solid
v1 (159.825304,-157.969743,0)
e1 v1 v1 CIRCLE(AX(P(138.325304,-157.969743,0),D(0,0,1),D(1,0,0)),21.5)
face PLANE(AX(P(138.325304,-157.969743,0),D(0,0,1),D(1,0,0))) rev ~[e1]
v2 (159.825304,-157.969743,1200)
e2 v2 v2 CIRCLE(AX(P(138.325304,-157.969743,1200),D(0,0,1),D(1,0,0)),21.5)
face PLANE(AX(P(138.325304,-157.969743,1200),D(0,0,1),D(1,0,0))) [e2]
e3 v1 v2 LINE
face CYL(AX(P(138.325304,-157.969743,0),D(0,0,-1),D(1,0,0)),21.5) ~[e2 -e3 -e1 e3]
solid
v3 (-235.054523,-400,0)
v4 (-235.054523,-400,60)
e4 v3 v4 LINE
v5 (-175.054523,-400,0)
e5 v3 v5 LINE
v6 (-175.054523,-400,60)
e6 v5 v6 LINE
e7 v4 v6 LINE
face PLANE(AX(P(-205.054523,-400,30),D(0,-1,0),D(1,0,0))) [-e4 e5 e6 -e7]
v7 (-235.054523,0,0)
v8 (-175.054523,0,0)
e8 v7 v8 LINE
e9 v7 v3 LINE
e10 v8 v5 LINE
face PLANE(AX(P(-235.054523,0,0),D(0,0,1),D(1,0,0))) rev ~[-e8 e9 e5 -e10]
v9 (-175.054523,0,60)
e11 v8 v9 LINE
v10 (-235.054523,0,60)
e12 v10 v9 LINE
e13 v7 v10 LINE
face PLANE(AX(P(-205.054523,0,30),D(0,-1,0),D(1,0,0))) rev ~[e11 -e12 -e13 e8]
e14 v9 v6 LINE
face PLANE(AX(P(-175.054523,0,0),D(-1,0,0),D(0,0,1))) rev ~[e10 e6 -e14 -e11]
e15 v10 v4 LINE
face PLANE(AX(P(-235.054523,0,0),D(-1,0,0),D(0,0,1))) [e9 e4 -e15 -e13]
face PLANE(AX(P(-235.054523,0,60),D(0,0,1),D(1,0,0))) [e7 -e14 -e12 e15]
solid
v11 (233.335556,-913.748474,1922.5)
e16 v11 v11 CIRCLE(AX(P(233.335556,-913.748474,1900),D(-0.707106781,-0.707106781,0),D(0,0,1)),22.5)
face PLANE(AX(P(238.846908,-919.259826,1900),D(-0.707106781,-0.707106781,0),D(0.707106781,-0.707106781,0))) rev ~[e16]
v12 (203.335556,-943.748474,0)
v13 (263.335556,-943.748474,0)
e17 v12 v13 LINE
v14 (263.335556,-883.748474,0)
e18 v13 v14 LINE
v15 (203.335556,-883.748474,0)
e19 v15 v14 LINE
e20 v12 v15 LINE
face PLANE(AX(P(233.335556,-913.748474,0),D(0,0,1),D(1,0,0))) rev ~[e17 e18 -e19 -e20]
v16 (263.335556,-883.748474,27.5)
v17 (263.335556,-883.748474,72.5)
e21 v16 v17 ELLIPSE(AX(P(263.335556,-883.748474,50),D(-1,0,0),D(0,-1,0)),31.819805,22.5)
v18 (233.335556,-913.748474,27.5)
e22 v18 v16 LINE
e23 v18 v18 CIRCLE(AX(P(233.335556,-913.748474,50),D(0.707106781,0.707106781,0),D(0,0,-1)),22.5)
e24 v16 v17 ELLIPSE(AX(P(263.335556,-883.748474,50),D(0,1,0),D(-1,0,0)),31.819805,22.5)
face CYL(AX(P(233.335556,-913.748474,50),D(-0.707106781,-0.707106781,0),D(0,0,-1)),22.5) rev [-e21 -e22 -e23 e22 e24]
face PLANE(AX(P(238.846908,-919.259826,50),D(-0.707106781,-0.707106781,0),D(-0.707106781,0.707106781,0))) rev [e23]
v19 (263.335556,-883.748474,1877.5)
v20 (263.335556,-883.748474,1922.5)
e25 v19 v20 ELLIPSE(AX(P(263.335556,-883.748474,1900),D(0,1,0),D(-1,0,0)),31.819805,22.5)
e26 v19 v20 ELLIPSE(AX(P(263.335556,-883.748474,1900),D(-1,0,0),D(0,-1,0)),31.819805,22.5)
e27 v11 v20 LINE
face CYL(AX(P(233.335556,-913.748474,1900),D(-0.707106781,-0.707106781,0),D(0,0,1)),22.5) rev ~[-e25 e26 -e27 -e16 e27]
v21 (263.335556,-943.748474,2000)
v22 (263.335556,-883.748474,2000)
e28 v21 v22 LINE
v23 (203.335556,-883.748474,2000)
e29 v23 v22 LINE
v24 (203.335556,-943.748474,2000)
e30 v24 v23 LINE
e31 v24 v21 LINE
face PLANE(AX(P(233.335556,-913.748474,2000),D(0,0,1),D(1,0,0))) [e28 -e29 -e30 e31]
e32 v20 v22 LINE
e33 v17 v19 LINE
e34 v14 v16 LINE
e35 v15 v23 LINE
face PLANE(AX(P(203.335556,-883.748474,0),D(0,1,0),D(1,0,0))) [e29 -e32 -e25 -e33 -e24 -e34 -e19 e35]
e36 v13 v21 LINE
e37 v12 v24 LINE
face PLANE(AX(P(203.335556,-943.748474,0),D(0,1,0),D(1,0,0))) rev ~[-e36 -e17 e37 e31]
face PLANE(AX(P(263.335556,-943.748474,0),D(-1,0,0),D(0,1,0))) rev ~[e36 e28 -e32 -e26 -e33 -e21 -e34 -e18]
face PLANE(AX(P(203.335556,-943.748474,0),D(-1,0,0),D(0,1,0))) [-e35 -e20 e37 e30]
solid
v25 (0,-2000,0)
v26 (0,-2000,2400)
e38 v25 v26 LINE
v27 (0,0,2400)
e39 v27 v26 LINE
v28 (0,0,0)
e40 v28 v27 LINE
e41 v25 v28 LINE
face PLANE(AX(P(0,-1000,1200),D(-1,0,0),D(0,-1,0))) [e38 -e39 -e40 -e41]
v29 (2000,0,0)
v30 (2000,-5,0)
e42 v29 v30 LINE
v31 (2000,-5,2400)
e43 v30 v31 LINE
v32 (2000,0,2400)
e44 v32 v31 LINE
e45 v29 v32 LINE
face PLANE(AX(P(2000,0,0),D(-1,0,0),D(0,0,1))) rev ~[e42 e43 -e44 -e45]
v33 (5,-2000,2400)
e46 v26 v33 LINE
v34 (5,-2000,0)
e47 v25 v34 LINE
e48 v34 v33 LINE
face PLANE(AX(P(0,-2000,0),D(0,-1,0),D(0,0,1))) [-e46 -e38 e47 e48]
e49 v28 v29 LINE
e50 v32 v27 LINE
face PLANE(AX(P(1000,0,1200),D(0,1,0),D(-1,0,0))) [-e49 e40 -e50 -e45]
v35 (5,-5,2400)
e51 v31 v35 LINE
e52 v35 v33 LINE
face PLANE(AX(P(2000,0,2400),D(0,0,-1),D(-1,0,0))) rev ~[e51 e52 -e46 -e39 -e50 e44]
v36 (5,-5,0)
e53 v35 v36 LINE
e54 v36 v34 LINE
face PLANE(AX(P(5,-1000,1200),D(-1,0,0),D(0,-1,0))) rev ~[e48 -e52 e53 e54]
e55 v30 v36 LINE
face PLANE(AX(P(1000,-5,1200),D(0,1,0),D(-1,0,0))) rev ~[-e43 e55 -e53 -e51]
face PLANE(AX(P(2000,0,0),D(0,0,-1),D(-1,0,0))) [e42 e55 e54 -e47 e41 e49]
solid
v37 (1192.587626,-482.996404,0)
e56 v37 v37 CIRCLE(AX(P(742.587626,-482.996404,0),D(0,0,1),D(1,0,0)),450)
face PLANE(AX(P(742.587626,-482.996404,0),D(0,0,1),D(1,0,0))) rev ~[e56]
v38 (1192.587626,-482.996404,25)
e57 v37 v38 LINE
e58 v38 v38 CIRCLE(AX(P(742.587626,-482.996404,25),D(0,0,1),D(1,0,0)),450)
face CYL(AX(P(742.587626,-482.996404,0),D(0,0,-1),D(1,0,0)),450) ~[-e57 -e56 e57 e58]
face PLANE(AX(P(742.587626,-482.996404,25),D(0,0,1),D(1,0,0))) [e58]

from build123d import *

# Parameters (mm, degrees)
F2_W      = 60
F2_H      = 60
F3_DEPTH  = 2000
F1_E1_W   = 2000
F1_E1_H   = 2400
F4_DEPTH  = 5
F1_E0_W   = 2000
F1_E0_H   = 2400
F5_DEPTH  = 5
F6_R      = 21.5
F7_DEPTH  = 1200
F10_DEPTH = 76
F12_R     = 450
F13_DEPTH = 25
F14_W     = 60
F14_H     = 60
F15_DEPTH = 400


# Not quite as in the source:
# - a pattern or mirror of a feature is missing from the dataset's text; its kind, count and spacing are read off the source's solid


with BuildPart() as f3:
    # F2 (on Top) → F3 (new body)
    with BuildSketch(Plane.XY):
        with Locations((233.3355557919, -913.7484741211)):
            Rectangle(F2_W, F2_H)
    extrude(amount=F3_DEPTH)

    # F9 (on face) → F10 (cut)
    with BuildSketch(Plane(origin=(-340.2064591646, -340.2064591646, 0), x_dir=(0.7071067812, -0.7071067812, 0), z_dir=(-0.7071067812, -0.7071067812, 0))):
        with BuildLine():
            ThreePointArc((833.6108961422, 1900), (827.0207987189, 1915.9099025767), (811.1108961422, 1922.5))
            Line((811.1108961422, 1922.5), (811.1108961422, 1877.5))
            ThreePointArc((811.1108961422, 1877.5), (827.0207987189, 1884.0900974233), (833.6108961422, 1900))
        make_face()
        with BuildLine():
            Line((811.1108961422, 1877.5), (811.1108961422, 1922.5))
            ThreePointArc((811.1108961422, 1922.5), (788.6108961422, 1900), (811.1108961422, 1877.5))
        make_face()
    f10 = extrude(amount=-F10_DEPTH, mode=Mode.SUBTRACT)

    # F10_copies: F10 across plane
    add(f10.mirror(Plane(origin=(0, 0, 975), x_dir=(-1, 0, 0), z_dir=(0, 0, -1))), mode=Mode.SUBTRACT)


with BuildPart() as f4:
    # F1_E1 (on explicit) → F4 (new body)
    with BuildSketch(Plane(origin=(0, 0, 0), x_dir=(0, -1, 0), z_dir=(-1, 0, 0))):
        with Locations((1000, 1200)):
            Rectangle(F1_E1_W, F1_E1_H)
    extrude(amount=-F4_DEPTH)

    # F1_E0 (on explicit) → F5 (join)
    with BuildSketch(Plane(origin=(2000, 0, 0), x_dir=(-1, 0, 0), z_dir=(0, 1, 0))):
        with Locations((1000, 1200)):
            Rectangle(F1_E0_W, F1_E0_H)
    extrude(amount=-F5_DEPTH)


with BuildPart() as f7:
    # F6 (on Top) → F7 (new body)
    with BuildSketch(Plane.XY):
        with Locations((138.325303793, -157.9697430134)):
            Circle(F6_R)
    extrude(amount=F7_DEPTH)


with BuildPart() as f13:
    # F12 (on Top) → F13 (new body)
    with BuildSketch(Plane.XY):
        with Locations((742.5876259804, -482.996404171)):
            Circle(F12_R)
    extrude(amount=F13_DEPTH)


with BuildPart() as f15:
    # F14 (on Front) → F15 (new body)
    with BuildSketch(Plane.XZ):
        with Locations((-205.0545227528, 30)):
            Rectangle(F14_W, F14_H)
    extrude(amount=F15_DEPTH)


solid = Compound([f3.part, f4.part, f7.part, f13.part, f15.part])
